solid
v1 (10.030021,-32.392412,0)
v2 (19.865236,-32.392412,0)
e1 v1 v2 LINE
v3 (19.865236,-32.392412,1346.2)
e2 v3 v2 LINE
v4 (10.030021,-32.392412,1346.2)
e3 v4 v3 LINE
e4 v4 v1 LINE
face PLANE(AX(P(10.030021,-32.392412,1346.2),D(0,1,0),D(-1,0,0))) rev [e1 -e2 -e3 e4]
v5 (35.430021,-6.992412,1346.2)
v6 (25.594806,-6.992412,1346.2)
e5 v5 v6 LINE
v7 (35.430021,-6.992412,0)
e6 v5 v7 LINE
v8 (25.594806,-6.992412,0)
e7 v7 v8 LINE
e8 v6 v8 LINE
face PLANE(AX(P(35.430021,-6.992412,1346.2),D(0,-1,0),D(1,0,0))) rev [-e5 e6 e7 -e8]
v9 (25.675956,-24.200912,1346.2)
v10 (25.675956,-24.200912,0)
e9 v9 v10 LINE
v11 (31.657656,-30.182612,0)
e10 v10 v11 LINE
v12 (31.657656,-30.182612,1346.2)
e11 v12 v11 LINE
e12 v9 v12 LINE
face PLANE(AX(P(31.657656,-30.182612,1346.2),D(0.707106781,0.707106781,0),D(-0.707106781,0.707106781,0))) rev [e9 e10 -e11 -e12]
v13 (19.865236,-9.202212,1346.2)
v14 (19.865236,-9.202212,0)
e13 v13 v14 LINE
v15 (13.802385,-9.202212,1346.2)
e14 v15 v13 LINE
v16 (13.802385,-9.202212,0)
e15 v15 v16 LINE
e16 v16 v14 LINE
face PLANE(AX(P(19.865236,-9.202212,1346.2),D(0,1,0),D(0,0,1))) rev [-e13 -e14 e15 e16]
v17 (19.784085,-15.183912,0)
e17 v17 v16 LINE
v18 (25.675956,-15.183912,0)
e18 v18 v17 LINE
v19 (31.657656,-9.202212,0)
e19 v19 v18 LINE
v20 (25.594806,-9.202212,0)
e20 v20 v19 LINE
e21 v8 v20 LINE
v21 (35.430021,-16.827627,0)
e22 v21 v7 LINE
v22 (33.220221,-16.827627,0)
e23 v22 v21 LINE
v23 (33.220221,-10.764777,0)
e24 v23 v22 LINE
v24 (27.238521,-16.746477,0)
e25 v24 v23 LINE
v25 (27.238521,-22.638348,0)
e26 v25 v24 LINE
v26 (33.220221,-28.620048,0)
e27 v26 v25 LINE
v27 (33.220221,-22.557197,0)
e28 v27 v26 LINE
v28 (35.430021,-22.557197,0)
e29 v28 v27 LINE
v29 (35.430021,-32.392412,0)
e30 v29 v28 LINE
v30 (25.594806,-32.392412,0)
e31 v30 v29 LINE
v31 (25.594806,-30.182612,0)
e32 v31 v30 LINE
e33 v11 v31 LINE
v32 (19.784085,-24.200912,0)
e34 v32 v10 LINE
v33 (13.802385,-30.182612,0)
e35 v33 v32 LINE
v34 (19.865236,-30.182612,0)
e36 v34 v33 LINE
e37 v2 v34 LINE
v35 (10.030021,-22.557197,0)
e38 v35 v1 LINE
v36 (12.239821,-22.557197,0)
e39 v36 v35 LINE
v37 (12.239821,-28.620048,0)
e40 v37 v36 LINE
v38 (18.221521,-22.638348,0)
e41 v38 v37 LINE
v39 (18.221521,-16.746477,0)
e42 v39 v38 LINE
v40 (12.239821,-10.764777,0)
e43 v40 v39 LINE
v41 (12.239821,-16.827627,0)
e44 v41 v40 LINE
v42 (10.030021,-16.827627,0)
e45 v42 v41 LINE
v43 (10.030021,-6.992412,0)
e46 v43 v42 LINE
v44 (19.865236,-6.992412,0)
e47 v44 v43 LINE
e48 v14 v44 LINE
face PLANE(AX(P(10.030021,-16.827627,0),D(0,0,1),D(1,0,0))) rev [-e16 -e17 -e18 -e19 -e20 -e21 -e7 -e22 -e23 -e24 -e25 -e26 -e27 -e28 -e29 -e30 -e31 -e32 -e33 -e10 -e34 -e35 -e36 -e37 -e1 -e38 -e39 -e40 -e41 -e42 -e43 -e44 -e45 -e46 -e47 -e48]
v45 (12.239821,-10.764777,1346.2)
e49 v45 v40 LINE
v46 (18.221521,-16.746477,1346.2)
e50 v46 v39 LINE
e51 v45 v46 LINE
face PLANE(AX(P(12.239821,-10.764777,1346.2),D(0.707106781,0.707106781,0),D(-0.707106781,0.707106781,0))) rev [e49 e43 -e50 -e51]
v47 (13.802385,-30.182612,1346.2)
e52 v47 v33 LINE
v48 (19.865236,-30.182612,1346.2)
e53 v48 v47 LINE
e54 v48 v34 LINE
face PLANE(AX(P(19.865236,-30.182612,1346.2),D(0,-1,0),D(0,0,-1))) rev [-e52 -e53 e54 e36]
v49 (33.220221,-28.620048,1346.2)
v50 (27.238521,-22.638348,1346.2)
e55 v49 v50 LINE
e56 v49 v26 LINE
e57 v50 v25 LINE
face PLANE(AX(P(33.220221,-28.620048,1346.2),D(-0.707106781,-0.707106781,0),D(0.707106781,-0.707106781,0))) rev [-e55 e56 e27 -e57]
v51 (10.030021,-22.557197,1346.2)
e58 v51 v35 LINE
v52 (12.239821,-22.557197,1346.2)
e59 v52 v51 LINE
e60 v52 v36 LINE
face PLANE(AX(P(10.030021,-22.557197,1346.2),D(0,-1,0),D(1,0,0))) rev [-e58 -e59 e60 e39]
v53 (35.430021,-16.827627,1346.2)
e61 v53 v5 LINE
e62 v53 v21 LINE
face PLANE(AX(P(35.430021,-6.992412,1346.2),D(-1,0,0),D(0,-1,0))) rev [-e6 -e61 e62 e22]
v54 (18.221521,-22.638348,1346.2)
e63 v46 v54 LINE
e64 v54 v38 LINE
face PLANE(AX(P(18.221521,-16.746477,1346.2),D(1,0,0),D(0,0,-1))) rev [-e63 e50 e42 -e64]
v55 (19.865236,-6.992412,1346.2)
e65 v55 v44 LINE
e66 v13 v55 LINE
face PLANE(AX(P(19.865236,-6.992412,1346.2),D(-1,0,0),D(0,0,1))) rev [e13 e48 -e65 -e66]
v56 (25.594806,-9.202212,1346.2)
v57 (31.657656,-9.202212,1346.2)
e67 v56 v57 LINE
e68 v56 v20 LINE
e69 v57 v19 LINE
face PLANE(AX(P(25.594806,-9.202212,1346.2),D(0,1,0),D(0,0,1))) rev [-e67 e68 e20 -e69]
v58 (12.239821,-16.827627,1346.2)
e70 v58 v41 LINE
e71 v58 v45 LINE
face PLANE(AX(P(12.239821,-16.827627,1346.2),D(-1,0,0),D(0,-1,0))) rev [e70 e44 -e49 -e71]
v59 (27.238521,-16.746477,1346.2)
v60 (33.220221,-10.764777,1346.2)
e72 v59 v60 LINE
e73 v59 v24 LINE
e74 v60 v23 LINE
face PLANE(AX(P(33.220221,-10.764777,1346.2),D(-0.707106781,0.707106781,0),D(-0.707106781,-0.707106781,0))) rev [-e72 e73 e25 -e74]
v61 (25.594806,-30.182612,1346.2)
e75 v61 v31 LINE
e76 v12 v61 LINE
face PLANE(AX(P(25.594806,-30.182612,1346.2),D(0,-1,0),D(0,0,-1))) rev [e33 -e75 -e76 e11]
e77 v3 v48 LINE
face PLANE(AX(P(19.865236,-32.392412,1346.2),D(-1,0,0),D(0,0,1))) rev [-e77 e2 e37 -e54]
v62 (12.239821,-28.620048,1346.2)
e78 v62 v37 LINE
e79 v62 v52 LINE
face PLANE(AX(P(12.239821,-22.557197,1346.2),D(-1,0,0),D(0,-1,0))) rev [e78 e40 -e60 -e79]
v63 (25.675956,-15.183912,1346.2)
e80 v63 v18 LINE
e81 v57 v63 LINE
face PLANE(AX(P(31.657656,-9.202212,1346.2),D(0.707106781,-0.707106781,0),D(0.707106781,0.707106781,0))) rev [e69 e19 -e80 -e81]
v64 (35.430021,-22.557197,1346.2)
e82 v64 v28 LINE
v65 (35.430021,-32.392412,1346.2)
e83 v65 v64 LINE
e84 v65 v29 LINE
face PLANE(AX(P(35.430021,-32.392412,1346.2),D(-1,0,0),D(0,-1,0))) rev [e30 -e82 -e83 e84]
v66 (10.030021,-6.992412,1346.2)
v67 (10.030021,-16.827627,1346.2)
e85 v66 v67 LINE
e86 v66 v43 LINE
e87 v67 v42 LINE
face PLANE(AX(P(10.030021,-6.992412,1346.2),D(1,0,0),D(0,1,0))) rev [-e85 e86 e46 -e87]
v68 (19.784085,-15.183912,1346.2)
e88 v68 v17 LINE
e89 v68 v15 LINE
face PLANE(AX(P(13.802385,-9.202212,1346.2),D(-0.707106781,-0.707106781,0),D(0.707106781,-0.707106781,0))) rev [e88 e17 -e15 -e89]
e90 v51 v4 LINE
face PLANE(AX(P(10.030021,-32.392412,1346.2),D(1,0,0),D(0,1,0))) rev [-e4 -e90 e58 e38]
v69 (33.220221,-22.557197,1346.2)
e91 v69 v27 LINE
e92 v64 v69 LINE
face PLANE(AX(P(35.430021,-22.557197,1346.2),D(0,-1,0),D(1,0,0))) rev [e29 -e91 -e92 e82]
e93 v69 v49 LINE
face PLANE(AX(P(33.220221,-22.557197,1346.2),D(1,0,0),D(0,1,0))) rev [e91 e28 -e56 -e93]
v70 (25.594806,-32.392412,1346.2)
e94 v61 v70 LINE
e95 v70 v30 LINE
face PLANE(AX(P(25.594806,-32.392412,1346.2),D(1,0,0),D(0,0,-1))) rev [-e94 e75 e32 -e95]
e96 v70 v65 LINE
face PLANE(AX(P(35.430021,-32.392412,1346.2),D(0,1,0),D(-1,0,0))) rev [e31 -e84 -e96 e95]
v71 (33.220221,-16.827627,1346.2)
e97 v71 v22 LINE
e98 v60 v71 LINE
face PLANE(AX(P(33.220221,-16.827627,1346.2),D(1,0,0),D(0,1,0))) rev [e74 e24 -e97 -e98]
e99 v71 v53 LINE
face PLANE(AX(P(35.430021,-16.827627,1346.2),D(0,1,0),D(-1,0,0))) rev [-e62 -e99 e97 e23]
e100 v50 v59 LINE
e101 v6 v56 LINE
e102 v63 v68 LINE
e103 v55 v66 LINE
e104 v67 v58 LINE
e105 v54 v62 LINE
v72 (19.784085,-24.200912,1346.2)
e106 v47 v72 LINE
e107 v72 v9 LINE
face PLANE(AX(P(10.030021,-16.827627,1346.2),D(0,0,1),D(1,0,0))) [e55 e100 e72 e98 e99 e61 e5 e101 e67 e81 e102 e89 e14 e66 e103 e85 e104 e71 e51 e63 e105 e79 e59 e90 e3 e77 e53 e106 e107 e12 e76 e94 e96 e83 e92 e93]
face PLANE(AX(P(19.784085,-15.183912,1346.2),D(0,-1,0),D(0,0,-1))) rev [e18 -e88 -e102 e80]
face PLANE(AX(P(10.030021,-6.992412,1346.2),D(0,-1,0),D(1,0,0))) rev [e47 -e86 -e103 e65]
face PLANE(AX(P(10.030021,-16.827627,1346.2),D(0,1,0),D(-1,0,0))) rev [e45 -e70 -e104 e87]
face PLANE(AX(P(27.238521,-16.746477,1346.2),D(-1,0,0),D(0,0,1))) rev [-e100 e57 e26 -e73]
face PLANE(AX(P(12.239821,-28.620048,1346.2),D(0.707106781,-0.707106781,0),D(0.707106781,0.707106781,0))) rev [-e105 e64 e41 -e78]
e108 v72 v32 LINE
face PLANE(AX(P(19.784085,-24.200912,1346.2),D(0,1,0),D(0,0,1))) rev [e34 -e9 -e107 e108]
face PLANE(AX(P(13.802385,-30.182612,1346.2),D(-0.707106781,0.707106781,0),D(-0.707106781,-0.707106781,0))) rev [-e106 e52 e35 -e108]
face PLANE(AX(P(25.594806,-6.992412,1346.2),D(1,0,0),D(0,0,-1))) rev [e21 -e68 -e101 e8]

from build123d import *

# Parameters (mm, degrees)
EXTRUDE1_DEPTH = 1346.2


# Read off the part's stored shape, not the designer's step: 1010<1>
with BuildPart() as part:
    # Sketch1<2> → Extrude1 (new body)
    with BuildSketch(Plane.XY):
        Polygon((10.030020765, -6.992412451), (19.865235782, -6.992412451), (19.865235782, -9.202212451), (13.80238533, -9.202212451), (19.78408533, -15.183912451), (25.6759562, -15.183912451), (31.6576562, -9.202212451), (25.594805747, -9.202212451), (25.594805747, -6.992412451), (35.430020765, -6.992412451), (35.430020765, -16.827627469), (33.220220765, -16.827627469), (33.220220765, -10.764777016), (27.238520765, -16.746477016), (27.238520765, -22.638347886), (33.220220765, -28.620047886), (33.220220765, -22.557197434), (35.430020765, -22.557197434), (35.430020765, -32.392412451), (25.594805747, -32.392412451), (25.594805747, -30.182612451), (31.6576562, -30.182612451), (25.6759562, -24.200912451), (19.78408533, -24.200912451), (13.80238533, -30.182612451), (19.865235782, -30.182612451), (19.865235782, -32.392412451), (10.030020765, -32.392412451), (10.030020765, -22.557197434), (12.239820765, -22.557197434), (12.239820765, -28.620047886), (18.221520765, -22.638347886), (18.221520765, -16.746477016), (12.239820765, -10.764777016), (12.239820765, -16.827627469), (10.030020765, -16.827627469), align=None)
    extrude(amount=EXTRUDE1_DEPTH)


solid = part.part
